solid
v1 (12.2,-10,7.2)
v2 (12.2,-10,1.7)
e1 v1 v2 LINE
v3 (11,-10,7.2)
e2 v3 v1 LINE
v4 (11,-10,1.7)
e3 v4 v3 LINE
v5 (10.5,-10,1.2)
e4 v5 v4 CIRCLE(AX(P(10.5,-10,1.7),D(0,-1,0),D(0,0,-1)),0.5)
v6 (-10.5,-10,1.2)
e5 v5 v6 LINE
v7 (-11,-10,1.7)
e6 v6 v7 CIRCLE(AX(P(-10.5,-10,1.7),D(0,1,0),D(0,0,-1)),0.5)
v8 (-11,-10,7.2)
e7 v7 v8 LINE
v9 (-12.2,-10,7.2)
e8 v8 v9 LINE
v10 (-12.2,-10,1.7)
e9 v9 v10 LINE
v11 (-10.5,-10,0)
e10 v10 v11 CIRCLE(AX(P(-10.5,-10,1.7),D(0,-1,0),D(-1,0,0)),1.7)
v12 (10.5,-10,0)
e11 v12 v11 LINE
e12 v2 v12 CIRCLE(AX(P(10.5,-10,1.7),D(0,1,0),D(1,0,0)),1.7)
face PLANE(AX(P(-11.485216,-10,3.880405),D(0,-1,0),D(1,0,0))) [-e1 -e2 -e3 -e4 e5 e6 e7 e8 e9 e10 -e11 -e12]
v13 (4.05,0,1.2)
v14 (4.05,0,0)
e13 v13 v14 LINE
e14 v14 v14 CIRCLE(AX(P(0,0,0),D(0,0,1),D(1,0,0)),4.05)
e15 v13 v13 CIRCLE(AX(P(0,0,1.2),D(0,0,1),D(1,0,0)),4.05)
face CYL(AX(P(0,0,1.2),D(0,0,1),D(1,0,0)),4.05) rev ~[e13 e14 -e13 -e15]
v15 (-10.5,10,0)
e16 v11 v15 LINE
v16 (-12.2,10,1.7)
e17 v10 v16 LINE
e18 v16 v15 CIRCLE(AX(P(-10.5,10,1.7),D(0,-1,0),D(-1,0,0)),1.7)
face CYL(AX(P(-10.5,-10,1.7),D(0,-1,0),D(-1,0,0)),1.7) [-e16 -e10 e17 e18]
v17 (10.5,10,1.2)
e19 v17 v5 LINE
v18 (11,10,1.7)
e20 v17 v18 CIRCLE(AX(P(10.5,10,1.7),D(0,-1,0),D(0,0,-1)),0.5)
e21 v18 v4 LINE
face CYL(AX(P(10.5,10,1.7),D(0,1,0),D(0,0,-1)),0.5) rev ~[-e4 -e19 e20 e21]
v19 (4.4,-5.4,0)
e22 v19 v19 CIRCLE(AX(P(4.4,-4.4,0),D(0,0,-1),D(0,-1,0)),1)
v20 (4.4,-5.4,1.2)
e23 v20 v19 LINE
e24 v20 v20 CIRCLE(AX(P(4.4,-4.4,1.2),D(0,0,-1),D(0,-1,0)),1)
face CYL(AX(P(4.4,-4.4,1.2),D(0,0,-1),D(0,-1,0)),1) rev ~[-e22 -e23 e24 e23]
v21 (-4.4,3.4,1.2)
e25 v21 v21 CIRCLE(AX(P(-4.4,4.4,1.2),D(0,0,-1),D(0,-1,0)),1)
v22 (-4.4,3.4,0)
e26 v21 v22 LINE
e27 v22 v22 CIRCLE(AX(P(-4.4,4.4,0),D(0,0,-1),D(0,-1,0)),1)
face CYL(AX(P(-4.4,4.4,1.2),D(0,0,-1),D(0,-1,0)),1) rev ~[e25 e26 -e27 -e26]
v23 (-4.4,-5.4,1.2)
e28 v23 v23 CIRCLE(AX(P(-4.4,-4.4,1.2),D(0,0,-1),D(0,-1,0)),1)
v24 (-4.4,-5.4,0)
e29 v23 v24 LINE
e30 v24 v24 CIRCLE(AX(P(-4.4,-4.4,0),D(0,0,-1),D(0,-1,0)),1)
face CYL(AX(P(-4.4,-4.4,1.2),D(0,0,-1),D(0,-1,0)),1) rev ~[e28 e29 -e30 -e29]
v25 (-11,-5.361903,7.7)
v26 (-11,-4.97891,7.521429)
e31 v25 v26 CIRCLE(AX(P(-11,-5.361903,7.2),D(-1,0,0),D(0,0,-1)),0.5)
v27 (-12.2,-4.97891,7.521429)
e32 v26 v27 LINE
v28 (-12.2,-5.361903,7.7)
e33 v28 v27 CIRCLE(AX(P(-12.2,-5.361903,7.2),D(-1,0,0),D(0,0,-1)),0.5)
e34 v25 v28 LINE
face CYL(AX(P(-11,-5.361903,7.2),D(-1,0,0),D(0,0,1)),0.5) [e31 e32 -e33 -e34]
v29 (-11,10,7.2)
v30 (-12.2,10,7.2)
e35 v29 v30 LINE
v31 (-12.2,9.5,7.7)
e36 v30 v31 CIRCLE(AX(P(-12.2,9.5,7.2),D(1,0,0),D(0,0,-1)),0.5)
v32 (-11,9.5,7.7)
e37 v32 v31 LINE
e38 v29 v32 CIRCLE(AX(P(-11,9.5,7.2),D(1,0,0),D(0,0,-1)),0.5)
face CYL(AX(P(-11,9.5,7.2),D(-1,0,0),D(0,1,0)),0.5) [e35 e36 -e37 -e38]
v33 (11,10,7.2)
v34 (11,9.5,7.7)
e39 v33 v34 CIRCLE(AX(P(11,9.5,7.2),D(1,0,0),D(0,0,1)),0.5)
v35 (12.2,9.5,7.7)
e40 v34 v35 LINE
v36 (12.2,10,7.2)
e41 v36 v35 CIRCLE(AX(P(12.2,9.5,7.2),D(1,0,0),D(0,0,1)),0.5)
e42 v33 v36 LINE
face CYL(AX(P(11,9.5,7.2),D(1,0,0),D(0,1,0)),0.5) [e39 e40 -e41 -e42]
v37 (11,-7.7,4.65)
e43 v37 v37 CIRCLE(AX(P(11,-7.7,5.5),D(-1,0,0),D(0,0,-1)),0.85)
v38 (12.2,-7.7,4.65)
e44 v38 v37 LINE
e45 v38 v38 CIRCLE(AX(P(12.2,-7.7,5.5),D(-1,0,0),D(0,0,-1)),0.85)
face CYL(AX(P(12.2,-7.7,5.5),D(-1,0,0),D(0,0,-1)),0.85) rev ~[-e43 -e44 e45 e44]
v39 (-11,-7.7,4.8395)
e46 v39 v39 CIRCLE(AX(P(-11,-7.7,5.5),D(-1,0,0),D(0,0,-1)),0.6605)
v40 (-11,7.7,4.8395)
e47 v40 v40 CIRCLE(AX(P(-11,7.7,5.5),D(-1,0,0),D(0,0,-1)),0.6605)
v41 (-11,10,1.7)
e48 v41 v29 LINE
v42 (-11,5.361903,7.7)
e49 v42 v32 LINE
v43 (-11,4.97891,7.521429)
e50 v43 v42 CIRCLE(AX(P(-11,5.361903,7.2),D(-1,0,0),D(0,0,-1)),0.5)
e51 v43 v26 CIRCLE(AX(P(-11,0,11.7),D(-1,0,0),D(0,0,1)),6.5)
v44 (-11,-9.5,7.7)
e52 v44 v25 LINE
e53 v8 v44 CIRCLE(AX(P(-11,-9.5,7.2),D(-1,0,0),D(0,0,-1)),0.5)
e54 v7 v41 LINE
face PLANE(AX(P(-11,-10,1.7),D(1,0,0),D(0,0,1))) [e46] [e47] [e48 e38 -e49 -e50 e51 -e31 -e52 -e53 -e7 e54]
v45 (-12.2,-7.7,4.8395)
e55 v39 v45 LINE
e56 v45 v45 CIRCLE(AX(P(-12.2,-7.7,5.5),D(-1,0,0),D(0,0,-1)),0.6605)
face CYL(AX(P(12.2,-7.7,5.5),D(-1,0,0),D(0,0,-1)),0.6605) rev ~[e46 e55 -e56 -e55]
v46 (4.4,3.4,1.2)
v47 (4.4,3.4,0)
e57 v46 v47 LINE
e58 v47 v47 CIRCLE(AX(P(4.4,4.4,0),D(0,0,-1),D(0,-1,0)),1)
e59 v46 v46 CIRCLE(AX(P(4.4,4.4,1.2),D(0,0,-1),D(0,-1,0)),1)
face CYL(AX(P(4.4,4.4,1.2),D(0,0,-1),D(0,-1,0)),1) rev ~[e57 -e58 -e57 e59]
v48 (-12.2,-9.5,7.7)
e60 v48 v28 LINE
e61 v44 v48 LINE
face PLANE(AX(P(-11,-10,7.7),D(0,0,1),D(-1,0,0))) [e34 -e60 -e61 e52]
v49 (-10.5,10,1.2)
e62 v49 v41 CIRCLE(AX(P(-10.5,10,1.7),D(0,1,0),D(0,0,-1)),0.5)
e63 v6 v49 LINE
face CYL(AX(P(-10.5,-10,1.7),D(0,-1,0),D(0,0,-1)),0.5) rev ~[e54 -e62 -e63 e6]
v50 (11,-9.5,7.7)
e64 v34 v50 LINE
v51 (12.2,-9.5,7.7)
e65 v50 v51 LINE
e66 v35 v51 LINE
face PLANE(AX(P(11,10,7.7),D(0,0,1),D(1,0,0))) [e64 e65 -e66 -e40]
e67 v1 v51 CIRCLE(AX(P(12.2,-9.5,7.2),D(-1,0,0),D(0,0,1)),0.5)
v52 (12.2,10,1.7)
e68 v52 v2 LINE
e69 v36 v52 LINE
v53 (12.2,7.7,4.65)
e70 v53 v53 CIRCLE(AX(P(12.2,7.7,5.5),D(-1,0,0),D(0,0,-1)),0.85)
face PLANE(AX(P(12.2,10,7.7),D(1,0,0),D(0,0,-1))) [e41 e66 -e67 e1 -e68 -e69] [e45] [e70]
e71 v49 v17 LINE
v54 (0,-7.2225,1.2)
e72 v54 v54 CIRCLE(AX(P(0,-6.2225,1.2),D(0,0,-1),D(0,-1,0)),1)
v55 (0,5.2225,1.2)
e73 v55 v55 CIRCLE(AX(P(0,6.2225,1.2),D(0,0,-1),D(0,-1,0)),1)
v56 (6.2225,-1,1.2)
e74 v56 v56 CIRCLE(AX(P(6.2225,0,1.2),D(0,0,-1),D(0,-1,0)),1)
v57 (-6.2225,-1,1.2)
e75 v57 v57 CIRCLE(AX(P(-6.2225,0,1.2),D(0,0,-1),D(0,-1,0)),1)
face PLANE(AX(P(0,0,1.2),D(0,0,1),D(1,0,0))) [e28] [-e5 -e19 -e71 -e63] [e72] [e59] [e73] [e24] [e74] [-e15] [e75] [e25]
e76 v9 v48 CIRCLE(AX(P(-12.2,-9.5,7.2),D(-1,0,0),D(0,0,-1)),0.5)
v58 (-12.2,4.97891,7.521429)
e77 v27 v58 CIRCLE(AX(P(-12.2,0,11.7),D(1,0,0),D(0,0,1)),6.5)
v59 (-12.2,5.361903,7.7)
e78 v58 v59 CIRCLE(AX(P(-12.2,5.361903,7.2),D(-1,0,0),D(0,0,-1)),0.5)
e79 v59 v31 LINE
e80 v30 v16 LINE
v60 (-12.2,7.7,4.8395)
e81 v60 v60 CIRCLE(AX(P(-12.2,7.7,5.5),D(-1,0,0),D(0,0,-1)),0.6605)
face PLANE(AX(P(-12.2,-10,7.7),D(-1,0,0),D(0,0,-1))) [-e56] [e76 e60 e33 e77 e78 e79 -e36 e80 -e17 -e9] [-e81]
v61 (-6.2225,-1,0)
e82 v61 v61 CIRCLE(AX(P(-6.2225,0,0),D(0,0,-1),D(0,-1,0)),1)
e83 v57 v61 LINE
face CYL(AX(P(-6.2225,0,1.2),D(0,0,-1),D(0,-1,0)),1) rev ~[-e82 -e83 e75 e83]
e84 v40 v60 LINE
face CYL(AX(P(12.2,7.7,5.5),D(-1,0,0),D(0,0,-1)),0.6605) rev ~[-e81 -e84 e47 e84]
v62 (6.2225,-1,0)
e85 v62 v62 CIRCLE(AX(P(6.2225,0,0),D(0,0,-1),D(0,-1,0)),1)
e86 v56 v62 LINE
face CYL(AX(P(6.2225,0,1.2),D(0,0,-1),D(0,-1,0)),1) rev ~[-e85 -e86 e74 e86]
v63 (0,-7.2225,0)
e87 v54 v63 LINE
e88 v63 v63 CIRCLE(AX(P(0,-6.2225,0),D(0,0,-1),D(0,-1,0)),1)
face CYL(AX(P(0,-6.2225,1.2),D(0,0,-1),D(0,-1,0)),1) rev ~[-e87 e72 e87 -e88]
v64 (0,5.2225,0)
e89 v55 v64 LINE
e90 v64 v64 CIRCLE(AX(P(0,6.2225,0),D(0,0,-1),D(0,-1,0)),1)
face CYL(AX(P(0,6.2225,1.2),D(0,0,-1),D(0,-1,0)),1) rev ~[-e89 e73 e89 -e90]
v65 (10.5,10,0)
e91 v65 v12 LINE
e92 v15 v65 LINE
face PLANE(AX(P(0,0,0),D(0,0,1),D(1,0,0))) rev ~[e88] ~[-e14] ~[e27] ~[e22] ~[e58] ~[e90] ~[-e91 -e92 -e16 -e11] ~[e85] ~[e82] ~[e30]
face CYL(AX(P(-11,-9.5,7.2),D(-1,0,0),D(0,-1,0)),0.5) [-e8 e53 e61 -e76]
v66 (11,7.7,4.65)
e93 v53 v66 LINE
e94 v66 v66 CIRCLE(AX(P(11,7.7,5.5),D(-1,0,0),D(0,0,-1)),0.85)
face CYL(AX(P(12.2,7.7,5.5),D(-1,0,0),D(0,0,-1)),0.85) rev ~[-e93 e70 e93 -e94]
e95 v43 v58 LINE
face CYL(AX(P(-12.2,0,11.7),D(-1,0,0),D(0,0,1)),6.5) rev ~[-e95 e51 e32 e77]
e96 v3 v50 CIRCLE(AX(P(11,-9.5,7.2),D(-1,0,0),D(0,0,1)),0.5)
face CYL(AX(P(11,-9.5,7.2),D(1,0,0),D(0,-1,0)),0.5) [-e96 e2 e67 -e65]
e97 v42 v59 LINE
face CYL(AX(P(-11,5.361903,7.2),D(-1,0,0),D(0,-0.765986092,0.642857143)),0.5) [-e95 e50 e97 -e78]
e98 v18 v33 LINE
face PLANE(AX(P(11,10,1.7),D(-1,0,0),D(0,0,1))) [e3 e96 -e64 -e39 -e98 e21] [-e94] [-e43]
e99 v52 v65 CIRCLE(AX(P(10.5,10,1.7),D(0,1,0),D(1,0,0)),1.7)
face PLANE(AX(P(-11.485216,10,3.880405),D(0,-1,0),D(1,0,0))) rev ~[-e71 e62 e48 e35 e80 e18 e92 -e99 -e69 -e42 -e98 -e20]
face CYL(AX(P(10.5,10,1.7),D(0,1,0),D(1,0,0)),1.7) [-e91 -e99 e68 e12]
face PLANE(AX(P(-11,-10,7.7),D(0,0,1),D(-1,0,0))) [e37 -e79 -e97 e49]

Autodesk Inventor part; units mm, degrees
ref_plane "YZ Plane" through (0, 0, 0) normal (1, 0, 0) x (0, 1, 0)
ref_plane "XZ Plane" through (0, 0, 0) normal (0, 1, 0) x (-1, 0, 0)
ref_plane "XY Plane" through (0, 0, 0) normal (0, 0, 1) x (1, 0, 0)
sketch "スケッチ1" plane through (0, 0, 0) normal (0, 0, 1) x (1, 0, 0)
  line L0 (11, -10) -> (-11, -10)
  line L1 (-11, -10) -> (-11, 10)
  line L2 (-11, 10) -> (11, 10)
  line L3 (11, 10) -> (11, -10)
  line L4 (11, -10) -> (-11, 10) construction
  line L5 (-11, -10) -> (11, 10) construction
  point P0 (0, 0)
  dimension "d2" = 22
  dimension "d3" = 20
extrude "プレート1" add sketch "スケッチ1" along normal blind 1.2
sketch "スケッチ2" plane through (-11, -10, 1.2) normal (-1, 0, 0) x (0, -1, 0)
  line L0 (-20, 0) -> (0, 0)
  line L1 (0, 0) -> (0, 6.5)
  line L2 (0, 6.5) -> (-20, 6.5)
  line L3 (-20, 6.5) -> (-20, 0)
edge flange "フランジ1" height 7.7 angle 90 thickness 1.2 bend radius 0.5 thickness toward (-1, 0, 0) relief tear relief width 1.2 relief depth 0.6 corner gap 1.2 corner form 0 edges at (-11, 0, 1.2) (11, 0, 1.2) wall of the first edge with corners at (-11, 10, 1.2) (-11, -10, 1.2) (-11, -10, 7.7) (-11, 10, 7.7)
bend "曲げ1"
corner "コーナー1"
sketch "スケッチ3" plane through (0, 0, 1.2) normal (0, 0, 1) x (1, 0, 0)
  circle A0 centre (0, 0) radius 4.05
  dimension "d15" = 8.1
extrude "押し出し1" cut sketch "スケッチ3" against normal through all
sketch "スケッチ4" plane through (0, 0, 1.2) normal (0, 0, 1) x (1, 0, 0)
  line L0 (0, 0) -> (0, 6.2225)
  circle A0 centre (0, 6.2225) radius 0.9423
  circle A1 centre (-4.4, 4.4) radius 0.9423
  circle A2 centre (-6.2225, 0) radius 0.9423
  circle A3 centre (-4.4, -4.4) radius 0.9423
  circle A4 centre (0, -6.2225) radius 0.9423
  circle A5 centre (4.4, -4.4) radius 0.9423
  circle A6 centre (6.2225, 0) radius 0.9423
  circle A7 centre (4.4, 4.4) radius 0.9423
  dimension "d20" = 360
  dimension "d22" = 8.8
hole "穴1" at (0, 6.2225, 1.2) at (4.4, 4.4, 1.2) at (6.2225, 0, 1.2) at (4.4, -4.4, 1.2) at (0, -6.2225, 1.2) at (-4.4, -4.4, 1.2) at (-6.2225, 0, 1.2) at (-4.4, 4.4, 1.2) direction (0, 0, -1) diameter 2 end through all
sketch "スケッチ5" plane through (12.2, -10, 7.7) normal (1, 0, 0) x (0, 0, -1)
  line L0 (2.2, 2.3) -> (2.2, 17.7)
  line L1 (6.5, 9) -> (6.5, 11) projected
  line L2 (6.5, 2.7775) -> (6.5, 4.7775) projected
  line L3 (6.5, 9) -> (6.5, 11) projected
  line L4 (6.5, 15.2225) -> (6.5, 17.2225) projected
  line L5 (6.5, 13.4) -> (6.5, 15.4) projected
  line L6 (6.5, 4.6) -> (6.5, 6.6) projected
  line L7 (6.5, 4.6) -> (6.5, 6.6) projected
  line L8 (6.5, 13.4) -> (6.5, 15.4) projected
  line L9 (6.5, 5.95) -> (6.5, 14.05) projected
  line L10 (6.5, 0) -> (6.5, 20) projected
  line L11 (6.5, 20) -> (6.5, 0) projected
  line L12 (7.7, 10) -> (2.2, 10)
  dimension "d30" = 15.4
  dimension "d31" = 4.3
hole "穴2" at (12.2, 7.7, 5.5) at (12.2, -7.7, 5.5) direction (-1, 0, 0) diameter 1.321 end through all thread size "M1.7x0.35" class "6H" standard "ISO Metric profile"
sketch "スケッチ6" plane through (12.2, -10, 7.7) normal (1, 0, 0) x (0, 0, -1)
  circle A0 centre (2.2, 17.7) radius 0.6605 projected
  circle A1 centre (2.2, 2.3) radius 0.6605 projected
  line L0 (6, 0) -> (6, 20) projected
  line L1 (0, 20) -> (6, 20) projected
  line L2 (0, 0) -> (0, 20) projected
  line L3 (6, 0) -> (0, 0) projected
  point P0 (7.7, 10)
hole "穴3" at (12.2, -7.7, 5.5) at (12.2, 7.7, 5.5) direction (-1, 0, 0) diameter 1.7 depth 10 tip angle 118
sketch "スケッチ7" plane through (-12.2, -10, 7.7) normal (-1, 0, 0) x (0, 0, 1)
  circle A0 centre (-2.2, 17.7) radius 0.6605 projected
  circle A1 centre (-2.2, 2.3) radius 0.6605 projected
  line L0 (-6, 20) -> (-6, 0) projected
  line L1 (0, 0) -> (-6, 0) projected
  line L2 (0, 20) -> (0, 0) projected
  line L3 (-6, 20) -> (0, 20) projected
  line L4 (-6.5, 11) -> (-6.5, 9) projected
  line L5 (-6.5, 4.7775) -> (-6.5, 2.7775) projected
  line L6 (-6.5, 11) -> (-6.5, 9) projected
  line L7 (-6.5, 17.2225) -> (-6.5, 15.2225) projected
  line L8 (-6.5, 15.4) -> (-6.5, 13.4) projected
  line L9 (-6.5, 6.6) -> (-6.5, 4.6) projected
  line L10 (-6.5, 6.6) -> (-6.5, 4.6) projected
  line L11 (-6.5, 15.4) -> (-6.5, 13.4) projected
  line L12 (-6.5, 14.05) -> (-6.5, 5.95) projected
  line L13 (-6.5, 0) -> (-6.5, 20) projected
  line L14 (-6.5, 20) -> (-6.5, 0) projected
  line L15 (-6.5, 10) -> (4, 10)
  circle A2 centre (4, 10) radius 6.5
  point P0 (-7.7, 10)
  dimension "d46" = 10.5
  dimension "d47" = 13
extrude "押し出し2" cut sketch "スケッチ7" against normal up to surface (1.2 mm away) contours A2 L2 L15 | L15 L2 A2 | A2 L2
fillet "コーナーR1" radius 0.5 6 edges at (-11.6, -10, 7.7) (11.6, -10, 7.7) (11.6, 10, 7.7) (-11.6, 10, 7.7) (-11.6, -5.1235, 7.7) (-11.6, 5.1235, 7.7)
equation "\"d28\" = Thickness"
equation "\"d5\" = BendReliefWidth"
equation "\"d6\" = BendReliefDepth"
equation "\"d7\" = MinimumRemnant"
equation "\"d8\" = BendRadius"
equation "\"d12\" = CornerReliefSize"
equation "\"d13\" = GapSize"
equation "\"d14\" = JacobiRadiusSize"
equation "\"BendRadius\" = Thickness"
equation "\"BendReliefWidth\" = Thickness"
equation "\"BendReliefDepth\" = 0.5 * Thickness"
equation "\"CornerReliefSize\" = 4 * Thickness"
equation "\"MinimumRemnant\" = 2 * Thickness"
equation "\"TransitionRadius\" = BendRadius"
equation "\"JacobiRadiusSize\" = BendRadius"
equation "\"GapSize\" = Thickness"
equation "\"d4\" = BendRadius"
equation "\"Thickness\" = 1.2"
properties part number "G-ROBOTSアルミブラケットC" material "アルミニウム 6061"
